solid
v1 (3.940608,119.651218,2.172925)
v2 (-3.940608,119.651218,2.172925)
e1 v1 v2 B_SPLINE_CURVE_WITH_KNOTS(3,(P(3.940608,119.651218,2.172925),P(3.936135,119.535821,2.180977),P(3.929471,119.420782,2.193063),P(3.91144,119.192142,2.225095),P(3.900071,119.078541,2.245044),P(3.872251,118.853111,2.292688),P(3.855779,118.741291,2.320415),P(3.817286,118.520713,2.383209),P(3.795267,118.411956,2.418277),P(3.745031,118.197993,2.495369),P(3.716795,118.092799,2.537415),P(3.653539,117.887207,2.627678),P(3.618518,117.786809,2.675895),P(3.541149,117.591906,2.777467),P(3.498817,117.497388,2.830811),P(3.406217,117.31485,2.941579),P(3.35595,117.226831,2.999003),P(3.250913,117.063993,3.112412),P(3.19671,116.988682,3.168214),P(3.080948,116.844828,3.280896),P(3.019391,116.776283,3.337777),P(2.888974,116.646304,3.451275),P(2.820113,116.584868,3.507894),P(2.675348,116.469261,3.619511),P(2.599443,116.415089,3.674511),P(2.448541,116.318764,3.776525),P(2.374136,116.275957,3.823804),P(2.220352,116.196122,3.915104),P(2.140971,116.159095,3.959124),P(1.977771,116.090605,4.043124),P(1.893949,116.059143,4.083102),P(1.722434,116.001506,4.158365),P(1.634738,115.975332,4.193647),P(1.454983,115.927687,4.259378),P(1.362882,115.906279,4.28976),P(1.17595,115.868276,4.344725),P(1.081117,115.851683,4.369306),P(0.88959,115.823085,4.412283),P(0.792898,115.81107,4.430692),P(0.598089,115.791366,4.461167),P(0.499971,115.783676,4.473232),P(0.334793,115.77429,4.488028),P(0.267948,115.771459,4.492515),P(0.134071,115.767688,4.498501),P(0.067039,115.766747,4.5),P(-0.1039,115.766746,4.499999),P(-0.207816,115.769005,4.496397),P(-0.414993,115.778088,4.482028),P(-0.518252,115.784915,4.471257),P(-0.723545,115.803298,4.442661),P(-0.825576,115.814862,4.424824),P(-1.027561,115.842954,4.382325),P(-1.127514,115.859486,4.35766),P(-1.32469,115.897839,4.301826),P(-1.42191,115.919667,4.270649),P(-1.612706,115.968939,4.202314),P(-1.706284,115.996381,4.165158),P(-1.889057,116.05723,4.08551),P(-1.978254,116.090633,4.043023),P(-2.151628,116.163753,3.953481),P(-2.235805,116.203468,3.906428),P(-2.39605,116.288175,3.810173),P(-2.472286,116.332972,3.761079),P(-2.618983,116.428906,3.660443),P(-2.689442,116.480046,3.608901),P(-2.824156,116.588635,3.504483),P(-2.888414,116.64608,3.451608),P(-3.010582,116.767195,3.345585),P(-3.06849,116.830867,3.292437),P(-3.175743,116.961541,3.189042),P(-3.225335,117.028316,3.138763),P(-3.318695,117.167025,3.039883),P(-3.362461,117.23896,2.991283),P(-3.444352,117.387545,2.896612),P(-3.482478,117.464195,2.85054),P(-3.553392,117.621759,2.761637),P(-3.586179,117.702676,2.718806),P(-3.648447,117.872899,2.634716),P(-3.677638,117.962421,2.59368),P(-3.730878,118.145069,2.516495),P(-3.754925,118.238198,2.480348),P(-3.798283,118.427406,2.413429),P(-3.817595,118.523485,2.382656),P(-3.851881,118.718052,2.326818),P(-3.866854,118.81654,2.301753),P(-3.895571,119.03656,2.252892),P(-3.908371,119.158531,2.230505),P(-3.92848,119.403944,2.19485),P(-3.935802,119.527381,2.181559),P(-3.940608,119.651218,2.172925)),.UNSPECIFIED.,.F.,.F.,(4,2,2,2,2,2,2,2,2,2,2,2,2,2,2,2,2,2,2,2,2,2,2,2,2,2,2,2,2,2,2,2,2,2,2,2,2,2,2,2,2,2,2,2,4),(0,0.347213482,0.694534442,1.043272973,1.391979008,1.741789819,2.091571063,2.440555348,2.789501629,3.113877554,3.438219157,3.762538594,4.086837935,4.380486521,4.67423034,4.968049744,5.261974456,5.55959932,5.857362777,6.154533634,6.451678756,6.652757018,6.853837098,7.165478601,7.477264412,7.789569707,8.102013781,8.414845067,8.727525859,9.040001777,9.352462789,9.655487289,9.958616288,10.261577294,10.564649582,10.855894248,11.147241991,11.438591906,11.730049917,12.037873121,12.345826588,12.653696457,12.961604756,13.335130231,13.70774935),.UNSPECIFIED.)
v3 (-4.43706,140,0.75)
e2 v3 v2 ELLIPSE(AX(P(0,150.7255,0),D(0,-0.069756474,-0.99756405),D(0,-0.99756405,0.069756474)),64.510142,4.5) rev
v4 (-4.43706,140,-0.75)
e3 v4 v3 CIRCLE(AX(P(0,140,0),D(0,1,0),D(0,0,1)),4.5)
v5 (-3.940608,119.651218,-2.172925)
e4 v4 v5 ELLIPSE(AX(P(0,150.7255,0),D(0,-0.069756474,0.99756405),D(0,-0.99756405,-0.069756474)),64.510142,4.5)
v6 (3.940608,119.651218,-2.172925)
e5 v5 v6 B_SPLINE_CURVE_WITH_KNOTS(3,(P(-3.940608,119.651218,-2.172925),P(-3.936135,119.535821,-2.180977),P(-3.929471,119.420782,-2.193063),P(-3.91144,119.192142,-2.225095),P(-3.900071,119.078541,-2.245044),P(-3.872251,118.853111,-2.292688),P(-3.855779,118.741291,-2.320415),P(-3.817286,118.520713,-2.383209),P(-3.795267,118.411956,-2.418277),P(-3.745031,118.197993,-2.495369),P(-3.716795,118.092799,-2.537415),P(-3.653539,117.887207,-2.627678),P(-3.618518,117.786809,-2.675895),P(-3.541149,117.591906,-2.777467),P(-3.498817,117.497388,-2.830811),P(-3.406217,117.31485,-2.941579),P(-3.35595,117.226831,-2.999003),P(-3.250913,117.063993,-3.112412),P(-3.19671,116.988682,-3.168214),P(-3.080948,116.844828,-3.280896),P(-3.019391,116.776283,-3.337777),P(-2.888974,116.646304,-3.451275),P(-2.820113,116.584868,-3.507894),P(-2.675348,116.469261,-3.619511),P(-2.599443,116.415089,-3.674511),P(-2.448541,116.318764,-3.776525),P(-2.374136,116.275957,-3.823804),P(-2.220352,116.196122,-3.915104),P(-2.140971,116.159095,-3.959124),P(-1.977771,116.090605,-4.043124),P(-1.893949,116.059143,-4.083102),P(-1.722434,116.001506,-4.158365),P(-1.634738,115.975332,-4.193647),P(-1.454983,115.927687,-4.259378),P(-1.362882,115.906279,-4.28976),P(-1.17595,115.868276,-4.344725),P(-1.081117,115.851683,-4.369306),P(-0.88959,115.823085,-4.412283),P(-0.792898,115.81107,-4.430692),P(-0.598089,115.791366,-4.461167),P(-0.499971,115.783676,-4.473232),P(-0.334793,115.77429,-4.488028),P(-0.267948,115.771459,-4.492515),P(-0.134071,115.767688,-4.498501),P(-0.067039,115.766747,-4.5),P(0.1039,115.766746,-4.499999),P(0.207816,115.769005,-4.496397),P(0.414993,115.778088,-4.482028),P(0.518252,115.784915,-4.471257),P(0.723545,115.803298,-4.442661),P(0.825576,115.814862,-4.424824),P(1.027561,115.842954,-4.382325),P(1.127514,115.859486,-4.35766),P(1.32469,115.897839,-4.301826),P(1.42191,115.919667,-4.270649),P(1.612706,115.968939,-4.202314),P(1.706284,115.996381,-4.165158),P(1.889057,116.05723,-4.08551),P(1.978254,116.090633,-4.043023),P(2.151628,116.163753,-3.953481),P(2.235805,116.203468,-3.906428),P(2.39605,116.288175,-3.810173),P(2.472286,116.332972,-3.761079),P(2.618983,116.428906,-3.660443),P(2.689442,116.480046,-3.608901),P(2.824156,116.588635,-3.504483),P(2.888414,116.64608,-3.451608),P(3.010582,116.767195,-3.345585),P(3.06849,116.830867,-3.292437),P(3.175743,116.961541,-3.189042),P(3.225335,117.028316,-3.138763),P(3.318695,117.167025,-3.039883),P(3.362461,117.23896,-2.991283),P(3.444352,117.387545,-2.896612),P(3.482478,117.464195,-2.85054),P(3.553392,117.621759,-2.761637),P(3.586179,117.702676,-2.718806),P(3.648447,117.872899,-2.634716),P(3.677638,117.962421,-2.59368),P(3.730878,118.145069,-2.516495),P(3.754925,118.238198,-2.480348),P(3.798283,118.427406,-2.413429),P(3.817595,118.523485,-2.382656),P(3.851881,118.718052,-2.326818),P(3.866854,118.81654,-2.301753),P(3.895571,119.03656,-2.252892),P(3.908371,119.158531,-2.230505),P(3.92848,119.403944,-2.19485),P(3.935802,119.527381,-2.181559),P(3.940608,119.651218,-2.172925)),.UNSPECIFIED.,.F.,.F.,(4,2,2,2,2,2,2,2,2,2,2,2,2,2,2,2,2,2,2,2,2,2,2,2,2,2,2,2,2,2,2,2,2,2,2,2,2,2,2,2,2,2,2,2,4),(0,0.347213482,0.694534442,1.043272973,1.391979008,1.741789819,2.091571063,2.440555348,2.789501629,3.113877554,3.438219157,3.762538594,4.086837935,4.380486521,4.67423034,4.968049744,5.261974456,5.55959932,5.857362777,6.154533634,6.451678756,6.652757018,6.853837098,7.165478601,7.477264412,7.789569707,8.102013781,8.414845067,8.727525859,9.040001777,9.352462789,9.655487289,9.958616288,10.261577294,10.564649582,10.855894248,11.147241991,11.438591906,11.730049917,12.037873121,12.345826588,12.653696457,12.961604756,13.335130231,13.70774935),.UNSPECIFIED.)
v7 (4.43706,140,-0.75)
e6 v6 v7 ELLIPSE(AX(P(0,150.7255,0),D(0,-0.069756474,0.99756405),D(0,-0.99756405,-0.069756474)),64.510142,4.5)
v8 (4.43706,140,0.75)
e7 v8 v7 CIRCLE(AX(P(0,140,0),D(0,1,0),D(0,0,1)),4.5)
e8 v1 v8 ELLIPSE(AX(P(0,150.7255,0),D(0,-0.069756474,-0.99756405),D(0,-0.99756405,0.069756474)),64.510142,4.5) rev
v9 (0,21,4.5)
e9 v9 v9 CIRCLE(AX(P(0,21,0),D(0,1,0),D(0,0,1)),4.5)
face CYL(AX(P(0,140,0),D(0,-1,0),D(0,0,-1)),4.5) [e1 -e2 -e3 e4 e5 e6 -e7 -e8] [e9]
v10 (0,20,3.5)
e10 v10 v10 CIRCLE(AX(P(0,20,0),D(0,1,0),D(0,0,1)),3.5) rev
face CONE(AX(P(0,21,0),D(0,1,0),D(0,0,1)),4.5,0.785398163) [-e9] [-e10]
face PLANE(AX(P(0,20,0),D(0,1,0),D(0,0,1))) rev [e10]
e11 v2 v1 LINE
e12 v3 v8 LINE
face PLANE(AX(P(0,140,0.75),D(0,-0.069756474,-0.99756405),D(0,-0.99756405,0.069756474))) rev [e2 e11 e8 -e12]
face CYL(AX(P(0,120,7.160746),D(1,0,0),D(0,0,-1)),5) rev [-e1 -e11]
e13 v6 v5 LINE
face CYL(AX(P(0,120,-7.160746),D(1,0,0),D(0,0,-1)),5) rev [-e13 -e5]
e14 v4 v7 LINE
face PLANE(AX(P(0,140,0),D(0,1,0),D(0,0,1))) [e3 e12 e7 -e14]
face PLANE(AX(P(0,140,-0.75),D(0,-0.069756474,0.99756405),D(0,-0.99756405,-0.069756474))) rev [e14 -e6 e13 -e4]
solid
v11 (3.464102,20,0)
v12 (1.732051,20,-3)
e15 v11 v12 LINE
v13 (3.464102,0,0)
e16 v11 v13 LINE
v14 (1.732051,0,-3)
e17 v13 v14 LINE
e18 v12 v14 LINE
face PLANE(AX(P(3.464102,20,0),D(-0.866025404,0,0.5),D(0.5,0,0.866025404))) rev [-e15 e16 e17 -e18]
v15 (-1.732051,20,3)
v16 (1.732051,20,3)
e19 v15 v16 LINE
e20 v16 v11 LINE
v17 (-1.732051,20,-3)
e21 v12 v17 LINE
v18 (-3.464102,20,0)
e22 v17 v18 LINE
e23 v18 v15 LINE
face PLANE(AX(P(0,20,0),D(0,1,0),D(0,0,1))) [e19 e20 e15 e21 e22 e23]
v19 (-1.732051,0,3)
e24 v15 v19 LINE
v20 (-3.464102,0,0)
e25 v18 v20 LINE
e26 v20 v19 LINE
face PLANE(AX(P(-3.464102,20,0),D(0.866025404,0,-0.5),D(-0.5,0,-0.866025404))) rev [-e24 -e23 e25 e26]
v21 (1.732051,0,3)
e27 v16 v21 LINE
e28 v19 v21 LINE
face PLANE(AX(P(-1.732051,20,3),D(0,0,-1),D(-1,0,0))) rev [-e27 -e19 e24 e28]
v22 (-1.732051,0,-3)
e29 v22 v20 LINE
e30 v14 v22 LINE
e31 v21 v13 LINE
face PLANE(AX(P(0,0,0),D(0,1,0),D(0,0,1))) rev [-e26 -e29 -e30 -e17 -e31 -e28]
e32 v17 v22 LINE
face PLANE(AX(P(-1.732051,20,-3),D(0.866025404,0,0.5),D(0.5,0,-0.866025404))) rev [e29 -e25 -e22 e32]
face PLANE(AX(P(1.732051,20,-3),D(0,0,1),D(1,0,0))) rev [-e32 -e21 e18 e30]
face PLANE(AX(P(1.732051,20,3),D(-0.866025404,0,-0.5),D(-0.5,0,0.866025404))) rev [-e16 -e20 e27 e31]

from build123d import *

# Parameters (mm, degrees)
BOSS_EXTRUDE1_DEPTH = 20
SKETCH3_R           = 4.5
BOSS_EXTRUDE3_DEPTH = 120
CHAMFER2_SIZE       = 1
CUT_EXTRUDE2_START  = -4.437059837
CUT_EXTRUDE2_DEPTH  = 8.874119674
FILLET2_R           = 5


# Read off the part's stored shape, not the designer's step: Cut-Extrude2
with BuildPart() as part:
    # Sketch2 → Boss-Extrude1 (new body)
    with BuildSketch(Plane(origin=(0, 0, 0), x_dir=(1, 0, 0), z_dir=(0, 1, 0))):
        Polygon((3.464101615, 0), (1.732050808, 3), (-1.732050808, 3), (-3.464101615, 0), (-1.732050808, -3), (1.732050808, -3), align=None)
    extrude(amount=BOSS_EXTRUDE1_DEPTH)


with BuildPart() as body_2:
    # Sketch3 → Boss-Extrude3 (new body)
    with BuildSketch(Plane(origin=(0, 20, 0), x_dir=(1, 0, 0), z_dir=(0, 1, 0))):
        with Locations(Location((0, 0, 0), (0, 0, 270))):
            Circle(SKETCH3_R)
    extrude(amount=BOSS_EXTRUDE3_DEPTH)

    # Chamfer2
    chamfer2_edges = [body_2.edges().sort_by_distance(p)[0] for p in [
        (0, 20, -4.5),
    ]]
    chamfer(chamfer2_edges, length=CHAMFER2_SIZE)

    # Cut-Extrude2 outline → Cut-Extrude2 (cut)
    with BuildSketch(Plane.YZ.offset(CUT_EXTRUDE2_START)):
        Polygon((115, 6), (115, 2.498170299), (140, 0.75), (140, 6), align=None)
        Polygon((140, -6), (140, -0.75), (115, -2.498170299), (115, -6), align=None)
    extrude(amount=CUT_EXTRUDE2_DEPTH, mode=Mode.SUBTRACT)

    # Fillet2
    # the kernel refuses this fillet: 5 mm, written as the material it adds along each edge
    with BuildSketch(Plane(origin=(-15.399317837, 115, -2.498170299), x_dir=(0, 0.9975640502586796, 0.0697564737604944), z_dir=(1, 0, 0))) as fillet2_piece_1_section:
        with BuildLine():
            CenterArc((FILLET2_R * 0.932515086122, -FILLET2_R), FILLET2_R, 90, 85.999999999)
            Line((-FILLET2_R * 0.0650489641364, -FILLET2_R * 0.93024352624), (0, 0))
            Line((0, 0), (FILLET2_R * 0.932515086122, 0))
        make_face()
    fillet2_piece_1 = extrude(amount=30.798635674, mode=Mode.PRIVATE)
    fillet2_piece_1 = fillet2_piece_1 & Plane(origin=(0, 116.359542547, 0), x_dir=(0, 0, 1), z_dir=(0, -1, 0)) * Cylinder(4.5, 81, mode=Mode.PRIVATE)
    add(fillet2_piece_1)
    with BuildSketch(Plane(origin=(-15.399317837, 115, 2.498170299), x_dir=(0, 0, 1), z_dir=(1, 0, 0))) as fillet2_piece_2_section:
        with BuildLine():
            CenterArc((FILLET2_R * 0.932515086122, -FILLET2_R), FILLET2_R, 90, 85.999999999)
            Line((-FILLET2_R * 0.0650489641364, -FILLET2_R * 0.93024352624), (0, 0))
            Line((0, 0), (FILLET2_R * 0.932515086122, 0))
        make_face()
    fillet2_piece_2 = extrude(amount=30.798635674, mode=Mode.PRIVATE)
    fillet2_piece_2 = fillet2_piece_2 & Plane(origin=(0, 116.359541243, 0), x_dir=(0, 0, 1), z_dir=(0, -1, 0)) * Cylinder(4.5, 81, mode=Mode.PRIVATE)
    add(fillet2_piece_2)


solid = Compound([part.part, body_2.part])
